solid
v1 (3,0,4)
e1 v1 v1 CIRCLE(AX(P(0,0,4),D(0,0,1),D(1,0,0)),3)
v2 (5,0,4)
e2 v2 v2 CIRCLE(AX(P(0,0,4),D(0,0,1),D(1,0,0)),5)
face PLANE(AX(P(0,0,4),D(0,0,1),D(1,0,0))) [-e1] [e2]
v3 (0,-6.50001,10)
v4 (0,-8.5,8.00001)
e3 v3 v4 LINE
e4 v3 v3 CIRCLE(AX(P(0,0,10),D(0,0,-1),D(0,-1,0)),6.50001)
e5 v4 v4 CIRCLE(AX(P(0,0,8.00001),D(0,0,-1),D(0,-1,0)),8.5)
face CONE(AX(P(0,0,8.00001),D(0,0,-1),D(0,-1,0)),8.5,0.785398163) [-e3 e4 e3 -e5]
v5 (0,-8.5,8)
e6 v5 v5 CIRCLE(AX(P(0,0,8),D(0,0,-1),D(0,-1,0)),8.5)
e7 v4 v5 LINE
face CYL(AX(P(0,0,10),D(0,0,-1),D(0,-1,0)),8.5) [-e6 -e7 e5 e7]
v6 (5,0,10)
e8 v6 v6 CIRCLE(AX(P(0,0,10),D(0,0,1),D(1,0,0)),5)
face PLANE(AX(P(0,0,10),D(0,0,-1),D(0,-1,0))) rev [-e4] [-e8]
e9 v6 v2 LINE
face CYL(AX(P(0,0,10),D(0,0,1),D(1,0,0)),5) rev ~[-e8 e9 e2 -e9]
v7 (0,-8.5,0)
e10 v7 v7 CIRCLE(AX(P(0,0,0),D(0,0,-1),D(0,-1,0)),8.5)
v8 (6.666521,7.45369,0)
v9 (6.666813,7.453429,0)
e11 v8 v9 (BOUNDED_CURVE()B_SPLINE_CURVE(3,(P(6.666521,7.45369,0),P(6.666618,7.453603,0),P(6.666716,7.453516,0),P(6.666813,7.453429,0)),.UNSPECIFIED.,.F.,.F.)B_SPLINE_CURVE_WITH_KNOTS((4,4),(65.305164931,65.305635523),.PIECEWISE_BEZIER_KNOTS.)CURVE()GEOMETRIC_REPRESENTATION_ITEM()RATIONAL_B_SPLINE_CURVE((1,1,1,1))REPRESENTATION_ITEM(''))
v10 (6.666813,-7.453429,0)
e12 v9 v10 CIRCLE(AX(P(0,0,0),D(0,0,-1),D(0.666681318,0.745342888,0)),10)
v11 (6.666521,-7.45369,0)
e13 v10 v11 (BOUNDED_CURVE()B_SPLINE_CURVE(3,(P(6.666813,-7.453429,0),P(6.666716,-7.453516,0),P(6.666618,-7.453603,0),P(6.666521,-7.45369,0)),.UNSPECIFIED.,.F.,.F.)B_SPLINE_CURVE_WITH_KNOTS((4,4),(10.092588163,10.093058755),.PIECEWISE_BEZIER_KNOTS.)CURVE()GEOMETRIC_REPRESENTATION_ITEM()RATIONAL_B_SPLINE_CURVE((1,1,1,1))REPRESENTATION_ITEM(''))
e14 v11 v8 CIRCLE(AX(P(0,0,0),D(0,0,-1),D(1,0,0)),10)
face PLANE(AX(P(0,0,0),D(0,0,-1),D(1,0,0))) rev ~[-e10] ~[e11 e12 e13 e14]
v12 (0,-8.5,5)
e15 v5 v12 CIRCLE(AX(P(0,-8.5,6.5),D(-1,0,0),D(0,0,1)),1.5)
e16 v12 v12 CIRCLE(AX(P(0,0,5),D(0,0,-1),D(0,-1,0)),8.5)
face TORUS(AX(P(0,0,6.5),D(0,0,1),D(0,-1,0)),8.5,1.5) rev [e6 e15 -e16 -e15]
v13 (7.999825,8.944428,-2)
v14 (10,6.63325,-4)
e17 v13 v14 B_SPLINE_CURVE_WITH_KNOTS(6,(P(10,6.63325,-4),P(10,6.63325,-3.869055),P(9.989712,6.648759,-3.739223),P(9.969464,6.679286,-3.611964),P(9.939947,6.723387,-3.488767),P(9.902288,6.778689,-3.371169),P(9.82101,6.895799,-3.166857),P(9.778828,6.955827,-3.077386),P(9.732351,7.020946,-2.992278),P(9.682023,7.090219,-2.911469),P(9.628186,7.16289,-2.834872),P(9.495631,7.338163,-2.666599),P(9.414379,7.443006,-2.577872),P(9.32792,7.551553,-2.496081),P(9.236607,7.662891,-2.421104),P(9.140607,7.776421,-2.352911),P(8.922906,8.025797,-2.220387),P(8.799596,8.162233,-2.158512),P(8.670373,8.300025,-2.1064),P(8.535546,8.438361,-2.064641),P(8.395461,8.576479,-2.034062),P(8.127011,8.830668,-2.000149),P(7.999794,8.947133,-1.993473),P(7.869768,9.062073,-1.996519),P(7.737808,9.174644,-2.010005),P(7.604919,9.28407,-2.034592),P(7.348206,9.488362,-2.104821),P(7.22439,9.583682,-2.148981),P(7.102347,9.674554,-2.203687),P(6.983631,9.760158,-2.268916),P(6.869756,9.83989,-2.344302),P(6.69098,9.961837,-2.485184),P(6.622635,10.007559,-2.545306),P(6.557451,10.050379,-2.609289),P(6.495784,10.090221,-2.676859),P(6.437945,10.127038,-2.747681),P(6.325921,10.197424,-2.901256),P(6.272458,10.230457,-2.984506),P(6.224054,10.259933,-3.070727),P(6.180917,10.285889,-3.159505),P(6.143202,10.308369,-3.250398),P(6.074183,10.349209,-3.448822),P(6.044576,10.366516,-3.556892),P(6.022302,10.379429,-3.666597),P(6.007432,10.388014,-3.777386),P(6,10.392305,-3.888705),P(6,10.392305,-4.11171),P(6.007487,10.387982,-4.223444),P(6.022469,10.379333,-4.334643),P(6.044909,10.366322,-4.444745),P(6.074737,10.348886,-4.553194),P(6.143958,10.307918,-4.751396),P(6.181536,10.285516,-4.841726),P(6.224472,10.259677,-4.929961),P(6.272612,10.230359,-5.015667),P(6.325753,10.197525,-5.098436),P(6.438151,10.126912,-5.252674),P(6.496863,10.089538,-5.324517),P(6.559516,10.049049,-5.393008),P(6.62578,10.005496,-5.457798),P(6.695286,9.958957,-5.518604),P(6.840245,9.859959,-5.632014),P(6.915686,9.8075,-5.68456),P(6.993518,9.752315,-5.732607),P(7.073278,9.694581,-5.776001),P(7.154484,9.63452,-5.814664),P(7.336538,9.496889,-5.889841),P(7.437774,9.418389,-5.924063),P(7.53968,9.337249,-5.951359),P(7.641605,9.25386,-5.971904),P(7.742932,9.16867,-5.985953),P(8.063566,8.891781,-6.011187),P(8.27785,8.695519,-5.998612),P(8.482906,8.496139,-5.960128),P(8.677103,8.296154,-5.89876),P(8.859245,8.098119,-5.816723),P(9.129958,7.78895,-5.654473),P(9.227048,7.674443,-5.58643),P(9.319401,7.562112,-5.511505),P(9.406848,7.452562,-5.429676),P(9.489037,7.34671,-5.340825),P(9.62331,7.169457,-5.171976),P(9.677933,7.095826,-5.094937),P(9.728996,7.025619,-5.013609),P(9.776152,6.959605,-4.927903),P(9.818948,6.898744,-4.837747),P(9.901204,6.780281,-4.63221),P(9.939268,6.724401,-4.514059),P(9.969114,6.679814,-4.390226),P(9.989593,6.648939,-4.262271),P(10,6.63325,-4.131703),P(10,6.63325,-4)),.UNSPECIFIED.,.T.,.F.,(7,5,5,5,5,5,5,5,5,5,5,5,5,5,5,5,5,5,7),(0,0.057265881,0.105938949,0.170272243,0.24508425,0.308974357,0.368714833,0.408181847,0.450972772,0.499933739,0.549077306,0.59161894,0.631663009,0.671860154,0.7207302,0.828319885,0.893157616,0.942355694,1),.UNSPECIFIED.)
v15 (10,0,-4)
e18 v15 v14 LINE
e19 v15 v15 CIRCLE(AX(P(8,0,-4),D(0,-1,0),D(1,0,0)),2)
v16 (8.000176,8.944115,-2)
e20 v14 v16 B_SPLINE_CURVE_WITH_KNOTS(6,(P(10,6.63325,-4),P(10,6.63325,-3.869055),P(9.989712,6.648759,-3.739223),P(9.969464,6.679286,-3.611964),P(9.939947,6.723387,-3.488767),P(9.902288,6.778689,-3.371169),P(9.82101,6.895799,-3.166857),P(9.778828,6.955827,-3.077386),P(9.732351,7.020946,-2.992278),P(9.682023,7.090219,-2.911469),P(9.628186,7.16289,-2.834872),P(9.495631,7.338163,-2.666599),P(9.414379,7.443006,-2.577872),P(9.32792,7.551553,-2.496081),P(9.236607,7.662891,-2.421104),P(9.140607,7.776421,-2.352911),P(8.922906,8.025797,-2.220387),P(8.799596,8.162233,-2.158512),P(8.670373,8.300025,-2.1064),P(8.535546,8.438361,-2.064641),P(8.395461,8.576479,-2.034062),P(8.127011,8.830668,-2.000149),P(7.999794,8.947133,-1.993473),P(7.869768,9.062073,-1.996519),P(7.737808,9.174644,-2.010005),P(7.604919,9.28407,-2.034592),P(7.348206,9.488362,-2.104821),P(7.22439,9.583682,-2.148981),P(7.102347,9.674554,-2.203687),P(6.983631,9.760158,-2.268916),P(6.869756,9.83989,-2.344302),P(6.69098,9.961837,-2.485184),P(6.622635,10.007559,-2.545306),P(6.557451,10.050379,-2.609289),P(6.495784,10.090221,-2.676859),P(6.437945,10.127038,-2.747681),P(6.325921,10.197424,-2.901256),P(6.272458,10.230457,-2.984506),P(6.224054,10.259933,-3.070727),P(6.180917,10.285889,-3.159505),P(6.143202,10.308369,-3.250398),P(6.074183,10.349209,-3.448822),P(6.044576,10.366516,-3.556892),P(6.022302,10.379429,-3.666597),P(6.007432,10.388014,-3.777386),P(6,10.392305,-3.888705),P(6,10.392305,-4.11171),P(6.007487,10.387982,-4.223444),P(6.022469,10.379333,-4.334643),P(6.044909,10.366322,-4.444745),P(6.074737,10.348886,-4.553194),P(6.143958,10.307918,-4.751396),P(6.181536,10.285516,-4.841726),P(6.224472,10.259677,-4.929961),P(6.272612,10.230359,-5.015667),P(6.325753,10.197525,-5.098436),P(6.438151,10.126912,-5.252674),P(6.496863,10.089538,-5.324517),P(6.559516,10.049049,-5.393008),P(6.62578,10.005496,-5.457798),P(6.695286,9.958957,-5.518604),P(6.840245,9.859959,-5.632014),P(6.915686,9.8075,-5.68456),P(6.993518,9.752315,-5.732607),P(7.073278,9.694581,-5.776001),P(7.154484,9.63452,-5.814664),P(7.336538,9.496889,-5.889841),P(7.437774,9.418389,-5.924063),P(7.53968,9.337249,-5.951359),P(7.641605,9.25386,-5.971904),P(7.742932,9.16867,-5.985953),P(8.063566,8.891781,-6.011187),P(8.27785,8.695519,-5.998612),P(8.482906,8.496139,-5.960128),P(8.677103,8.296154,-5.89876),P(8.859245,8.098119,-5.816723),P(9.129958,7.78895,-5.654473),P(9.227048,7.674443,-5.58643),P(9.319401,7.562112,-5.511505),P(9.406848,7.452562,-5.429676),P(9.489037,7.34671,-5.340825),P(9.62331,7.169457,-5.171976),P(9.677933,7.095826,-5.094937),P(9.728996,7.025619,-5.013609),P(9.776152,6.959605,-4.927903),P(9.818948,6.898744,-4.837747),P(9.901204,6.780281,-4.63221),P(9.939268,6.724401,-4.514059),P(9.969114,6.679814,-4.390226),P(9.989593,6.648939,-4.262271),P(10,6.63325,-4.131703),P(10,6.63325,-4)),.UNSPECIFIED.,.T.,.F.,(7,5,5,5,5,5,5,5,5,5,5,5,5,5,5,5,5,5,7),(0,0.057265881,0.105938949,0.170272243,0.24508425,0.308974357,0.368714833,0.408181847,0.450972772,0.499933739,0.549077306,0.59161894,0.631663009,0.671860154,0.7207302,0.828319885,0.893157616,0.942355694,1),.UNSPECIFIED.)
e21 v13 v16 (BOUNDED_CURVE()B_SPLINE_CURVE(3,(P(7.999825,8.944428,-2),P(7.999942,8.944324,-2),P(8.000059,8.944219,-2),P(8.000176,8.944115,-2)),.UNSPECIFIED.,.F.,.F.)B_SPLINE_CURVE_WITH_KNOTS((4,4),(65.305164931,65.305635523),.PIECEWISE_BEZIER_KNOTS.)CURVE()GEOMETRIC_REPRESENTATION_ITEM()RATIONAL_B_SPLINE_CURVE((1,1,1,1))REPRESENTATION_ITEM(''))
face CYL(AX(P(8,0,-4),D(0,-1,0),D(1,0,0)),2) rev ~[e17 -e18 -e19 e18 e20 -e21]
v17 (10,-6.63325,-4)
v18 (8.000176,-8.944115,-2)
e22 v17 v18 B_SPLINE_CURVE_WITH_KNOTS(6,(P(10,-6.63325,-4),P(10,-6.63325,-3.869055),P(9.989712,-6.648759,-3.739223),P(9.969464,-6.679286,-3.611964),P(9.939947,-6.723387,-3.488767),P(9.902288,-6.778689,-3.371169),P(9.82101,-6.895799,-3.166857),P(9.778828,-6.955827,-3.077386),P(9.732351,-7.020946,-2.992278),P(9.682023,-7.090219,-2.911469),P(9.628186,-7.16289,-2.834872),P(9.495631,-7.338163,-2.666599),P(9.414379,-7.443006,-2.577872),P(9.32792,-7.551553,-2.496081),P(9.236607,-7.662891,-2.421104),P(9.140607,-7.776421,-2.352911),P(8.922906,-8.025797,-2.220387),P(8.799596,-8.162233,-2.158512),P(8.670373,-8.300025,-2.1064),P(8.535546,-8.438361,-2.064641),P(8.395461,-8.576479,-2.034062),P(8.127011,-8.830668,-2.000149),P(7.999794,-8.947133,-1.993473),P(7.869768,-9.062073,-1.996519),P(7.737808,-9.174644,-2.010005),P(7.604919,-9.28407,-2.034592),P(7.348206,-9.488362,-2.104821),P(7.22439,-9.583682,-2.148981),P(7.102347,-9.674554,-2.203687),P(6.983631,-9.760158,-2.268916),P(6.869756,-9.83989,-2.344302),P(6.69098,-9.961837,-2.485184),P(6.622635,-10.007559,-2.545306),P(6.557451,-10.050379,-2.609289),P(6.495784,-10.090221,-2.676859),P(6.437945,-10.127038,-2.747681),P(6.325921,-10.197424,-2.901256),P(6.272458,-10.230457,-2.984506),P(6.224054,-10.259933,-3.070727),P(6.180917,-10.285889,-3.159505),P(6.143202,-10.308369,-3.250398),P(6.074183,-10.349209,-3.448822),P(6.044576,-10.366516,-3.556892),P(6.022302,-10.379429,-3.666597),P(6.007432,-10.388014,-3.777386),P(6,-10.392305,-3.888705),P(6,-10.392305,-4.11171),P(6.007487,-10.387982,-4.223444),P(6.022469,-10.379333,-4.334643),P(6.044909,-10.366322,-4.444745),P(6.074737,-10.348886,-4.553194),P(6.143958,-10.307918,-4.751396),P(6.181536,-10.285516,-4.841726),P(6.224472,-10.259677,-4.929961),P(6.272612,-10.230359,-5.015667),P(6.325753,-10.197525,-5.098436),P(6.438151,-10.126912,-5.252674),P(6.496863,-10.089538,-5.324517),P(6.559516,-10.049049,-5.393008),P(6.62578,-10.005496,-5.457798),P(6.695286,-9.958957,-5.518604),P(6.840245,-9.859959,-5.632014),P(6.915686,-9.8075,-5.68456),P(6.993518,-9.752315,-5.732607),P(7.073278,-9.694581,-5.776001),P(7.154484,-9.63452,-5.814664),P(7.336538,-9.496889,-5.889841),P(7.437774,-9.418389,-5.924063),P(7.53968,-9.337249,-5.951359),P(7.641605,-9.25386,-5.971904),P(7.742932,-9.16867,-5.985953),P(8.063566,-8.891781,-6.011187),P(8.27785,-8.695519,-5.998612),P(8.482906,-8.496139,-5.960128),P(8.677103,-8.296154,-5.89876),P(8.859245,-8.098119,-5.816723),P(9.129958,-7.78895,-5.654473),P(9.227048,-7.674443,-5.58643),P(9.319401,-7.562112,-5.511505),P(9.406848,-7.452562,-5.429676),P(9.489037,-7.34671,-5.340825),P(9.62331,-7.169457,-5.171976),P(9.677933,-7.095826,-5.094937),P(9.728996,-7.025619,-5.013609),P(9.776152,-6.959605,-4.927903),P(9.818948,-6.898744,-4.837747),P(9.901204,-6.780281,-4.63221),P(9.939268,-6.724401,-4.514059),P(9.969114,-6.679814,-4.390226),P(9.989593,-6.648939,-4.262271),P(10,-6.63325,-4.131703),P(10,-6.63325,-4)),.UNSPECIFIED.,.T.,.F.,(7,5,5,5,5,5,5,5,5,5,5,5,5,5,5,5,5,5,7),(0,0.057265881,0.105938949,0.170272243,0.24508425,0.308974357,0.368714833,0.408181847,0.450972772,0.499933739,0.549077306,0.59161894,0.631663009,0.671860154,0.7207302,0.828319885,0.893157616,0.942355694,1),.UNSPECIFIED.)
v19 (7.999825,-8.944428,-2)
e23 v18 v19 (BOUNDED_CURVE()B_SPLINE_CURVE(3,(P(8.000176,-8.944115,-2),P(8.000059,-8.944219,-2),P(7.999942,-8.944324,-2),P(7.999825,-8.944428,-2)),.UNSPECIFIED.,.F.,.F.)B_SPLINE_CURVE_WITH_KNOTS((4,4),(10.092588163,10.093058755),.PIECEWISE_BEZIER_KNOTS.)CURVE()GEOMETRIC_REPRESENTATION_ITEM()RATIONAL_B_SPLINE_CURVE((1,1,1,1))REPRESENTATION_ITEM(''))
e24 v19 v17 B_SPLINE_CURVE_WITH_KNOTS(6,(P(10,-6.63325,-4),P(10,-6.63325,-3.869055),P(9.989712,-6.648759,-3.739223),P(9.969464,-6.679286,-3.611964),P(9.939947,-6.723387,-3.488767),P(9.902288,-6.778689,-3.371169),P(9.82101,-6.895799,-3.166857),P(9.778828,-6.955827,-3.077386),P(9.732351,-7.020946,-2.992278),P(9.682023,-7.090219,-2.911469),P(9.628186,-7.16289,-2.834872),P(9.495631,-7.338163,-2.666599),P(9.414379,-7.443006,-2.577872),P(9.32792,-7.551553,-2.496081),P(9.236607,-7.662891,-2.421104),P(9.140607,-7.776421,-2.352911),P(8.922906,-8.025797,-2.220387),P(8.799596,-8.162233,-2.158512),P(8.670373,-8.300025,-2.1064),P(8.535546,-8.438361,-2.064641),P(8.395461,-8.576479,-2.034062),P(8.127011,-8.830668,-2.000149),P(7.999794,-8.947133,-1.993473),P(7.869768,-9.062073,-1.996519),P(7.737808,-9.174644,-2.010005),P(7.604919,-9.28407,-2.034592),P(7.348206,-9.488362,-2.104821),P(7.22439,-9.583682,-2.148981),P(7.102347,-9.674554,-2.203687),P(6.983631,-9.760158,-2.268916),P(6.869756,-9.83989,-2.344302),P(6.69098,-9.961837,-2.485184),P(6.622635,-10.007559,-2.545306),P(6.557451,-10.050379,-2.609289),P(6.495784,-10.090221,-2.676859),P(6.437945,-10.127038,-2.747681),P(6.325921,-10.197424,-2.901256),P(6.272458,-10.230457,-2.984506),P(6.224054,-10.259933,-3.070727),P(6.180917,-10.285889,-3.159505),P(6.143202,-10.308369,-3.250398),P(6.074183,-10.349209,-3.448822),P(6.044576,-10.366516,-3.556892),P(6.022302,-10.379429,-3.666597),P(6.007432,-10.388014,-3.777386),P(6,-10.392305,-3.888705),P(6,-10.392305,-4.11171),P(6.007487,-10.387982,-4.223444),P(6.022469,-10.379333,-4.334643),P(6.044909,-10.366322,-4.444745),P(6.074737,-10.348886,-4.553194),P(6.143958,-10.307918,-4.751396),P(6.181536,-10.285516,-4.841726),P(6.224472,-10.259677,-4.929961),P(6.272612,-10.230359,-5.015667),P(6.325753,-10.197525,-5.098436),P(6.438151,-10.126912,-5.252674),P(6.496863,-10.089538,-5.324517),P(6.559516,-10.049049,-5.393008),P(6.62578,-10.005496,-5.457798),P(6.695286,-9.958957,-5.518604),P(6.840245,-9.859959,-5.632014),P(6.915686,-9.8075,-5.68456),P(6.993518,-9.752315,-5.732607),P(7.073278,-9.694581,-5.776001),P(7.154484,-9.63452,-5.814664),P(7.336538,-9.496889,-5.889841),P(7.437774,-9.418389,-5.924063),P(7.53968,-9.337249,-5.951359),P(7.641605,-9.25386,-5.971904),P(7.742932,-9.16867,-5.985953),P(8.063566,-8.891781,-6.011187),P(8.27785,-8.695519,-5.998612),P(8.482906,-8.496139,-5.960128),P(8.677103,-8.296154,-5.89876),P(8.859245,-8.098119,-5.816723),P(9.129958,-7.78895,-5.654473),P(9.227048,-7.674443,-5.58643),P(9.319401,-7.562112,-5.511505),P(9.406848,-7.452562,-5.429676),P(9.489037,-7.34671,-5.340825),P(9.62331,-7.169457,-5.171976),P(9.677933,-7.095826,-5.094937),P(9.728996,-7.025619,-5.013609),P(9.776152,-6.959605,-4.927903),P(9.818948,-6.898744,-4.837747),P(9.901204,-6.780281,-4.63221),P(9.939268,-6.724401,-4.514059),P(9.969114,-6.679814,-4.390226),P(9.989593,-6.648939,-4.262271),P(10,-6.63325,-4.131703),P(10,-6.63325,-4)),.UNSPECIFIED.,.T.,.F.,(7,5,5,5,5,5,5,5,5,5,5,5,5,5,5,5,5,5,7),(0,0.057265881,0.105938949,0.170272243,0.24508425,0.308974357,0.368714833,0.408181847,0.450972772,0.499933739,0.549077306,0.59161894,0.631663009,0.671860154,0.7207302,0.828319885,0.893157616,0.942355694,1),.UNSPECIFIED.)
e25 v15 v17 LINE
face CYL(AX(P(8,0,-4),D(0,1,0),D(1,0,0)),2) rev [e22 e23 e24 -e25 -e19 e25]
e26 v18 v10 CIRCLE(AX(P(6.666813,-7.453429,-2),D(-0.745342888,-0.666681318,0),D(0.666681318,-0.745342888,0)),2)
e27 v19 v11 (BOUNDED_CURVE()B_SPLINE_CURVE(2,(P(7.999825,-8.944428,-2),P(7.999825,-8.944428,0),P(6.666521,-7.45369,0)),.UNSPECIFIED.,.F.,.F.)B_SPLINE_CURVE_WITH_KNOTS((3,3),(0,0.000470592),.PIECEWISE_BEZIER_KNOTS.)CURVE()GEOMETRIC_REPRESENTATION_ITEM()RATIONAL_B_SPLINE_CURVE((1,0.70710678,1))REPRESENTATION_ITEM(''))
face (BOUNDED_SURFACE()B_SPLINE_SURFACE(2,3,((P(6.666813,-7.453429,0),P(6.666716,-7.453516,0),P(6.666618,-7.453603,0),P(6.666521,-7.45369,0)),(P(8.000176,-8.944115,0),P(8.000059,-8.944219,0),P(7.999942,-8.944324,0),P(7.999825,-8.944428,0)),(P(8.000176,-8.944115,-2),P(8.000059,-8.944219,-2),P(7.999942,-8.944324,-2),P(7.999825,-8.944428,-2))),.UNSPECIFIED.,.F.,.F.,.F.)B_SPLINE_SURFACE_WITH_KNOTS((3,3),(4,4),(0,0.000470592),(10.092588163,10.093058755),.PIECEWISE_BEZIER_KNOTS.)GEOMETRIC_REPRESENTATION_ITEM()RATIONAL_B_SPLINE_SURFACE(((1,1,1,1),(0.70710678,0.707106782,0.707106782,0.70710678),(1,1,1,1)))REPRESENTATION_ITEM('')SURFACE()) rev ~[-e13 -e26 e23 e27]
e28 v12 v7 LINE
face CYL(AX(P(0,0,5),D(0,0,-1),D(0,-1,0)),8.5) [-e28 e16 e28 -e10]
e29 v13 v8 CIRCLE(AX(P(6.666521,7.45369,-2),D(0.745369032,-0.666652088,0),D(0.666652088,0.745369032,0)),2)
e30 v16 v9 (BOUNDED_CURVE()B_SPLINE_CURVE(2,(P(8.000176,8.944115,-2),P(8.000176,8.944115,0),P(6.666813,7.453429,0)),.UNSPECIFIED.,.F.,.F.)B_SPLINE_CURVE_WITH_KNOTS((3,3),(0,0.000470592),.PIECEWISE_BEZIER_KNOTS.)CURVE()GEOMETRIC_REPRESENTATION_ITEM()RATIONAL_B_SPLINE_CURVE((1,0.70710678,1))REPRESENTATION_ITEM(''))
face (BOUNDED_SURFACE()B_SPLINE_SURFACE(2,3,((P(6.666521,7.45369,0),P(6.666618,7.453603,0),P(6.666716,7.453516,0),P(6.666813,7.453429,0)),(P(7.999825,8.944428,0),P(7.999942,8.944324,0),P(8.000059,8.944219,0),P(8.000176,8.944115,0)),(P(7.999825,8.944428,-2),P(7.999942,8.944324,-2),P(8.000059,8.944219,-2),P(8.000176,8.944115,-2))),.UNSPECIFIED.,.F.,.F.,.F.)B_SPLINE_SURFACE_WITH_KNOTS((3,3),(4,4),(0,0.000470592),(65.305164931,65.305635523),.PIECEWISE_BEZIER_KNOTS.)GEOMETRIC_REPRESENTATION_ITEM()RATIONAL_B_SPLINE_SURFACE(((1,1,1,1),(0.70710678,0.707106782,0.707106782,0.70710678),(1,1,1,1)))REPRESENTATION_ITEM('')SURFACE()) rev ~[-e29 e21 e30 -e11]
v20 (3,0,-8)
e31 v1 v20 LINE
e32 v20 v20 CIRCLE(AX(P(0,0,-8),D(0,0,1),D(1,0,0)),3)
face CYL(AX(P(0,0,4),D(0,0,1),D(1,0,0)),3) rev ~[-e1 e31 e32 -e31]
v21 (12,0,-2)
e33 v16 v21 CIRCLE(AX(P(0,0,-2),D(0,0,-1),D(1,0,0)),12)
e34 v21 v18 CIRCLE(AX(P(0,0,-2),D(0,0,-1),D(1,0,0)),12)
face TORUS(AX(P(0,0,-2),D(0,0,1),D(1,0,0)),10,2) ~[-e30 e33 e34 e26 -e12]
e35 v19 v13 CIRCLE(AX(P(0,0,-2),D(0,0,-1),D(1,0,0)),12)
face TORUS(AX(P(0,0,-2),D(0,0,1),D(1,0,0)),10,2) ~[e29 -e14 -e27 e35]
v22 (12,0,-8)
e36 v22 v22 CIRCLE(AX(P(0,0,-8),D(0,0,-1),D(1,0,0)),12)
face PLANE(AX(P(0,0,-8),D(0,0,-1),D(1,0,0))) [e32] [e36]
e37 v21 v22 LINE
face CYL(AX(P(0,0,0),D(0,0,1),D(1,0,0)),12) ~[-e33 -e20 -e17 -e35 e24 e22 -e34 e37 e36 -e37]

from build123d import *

# Parameters (mm, degrees)
F2_SIZE        = 1.99999
F3_R           = 5
F4_DEPTH       = 6
F5_R           = 12
F6_DEPTH       = 8
F7_R           = 3
F8_DEPTH       = 12
F9_R           = 2
F10_DEPTH      = 12.001
F10_DEPTH_BACK = 12.001
F11_R          = 2


# Not quite as in the source:
# - a fillet or chamfer is up to 0.001 mm smaller than in the source, because OpenCascade refuses the exact size


with BuildPart() as f1:
    # F0 (on Right) → F1 (revolve)
    with BuildSketch(Plane.YZ):
        with BuildLine():
            Line((-8.5, 0), (0, 0))
            Line((0, 0), (0, 10))
            Line((0, 10), (-8.5, 10))
            Line((-8.5, 10), (-8.5, 8))
            ThreePointArc((-8.5, 8), (-7, 6.5), (-8.5, 5))
            Line((-8.5, 5), (-8.5, 0))
        make_face()
    revolve(axis=Axis((0, 0, 5), (0, 0, -1)))

    # F2 (size 2 in the source; OpenCascade refuses exactly that, so slightly less here)
    f2_edges = [f1.edges().sort_by_distance(p)[0] for p in [
        (0, 8.5, 10),
    ]]
    chamfer(f2_edges, length=F2_SIZE)

    # F3 (on face) → F4 (cut)
    with BuildSketch(Plane.XY.offset(10)):
        Circle(F3_R)
    extrude(amount=-F4_DEPTH, mode=Mode.SUBTRACT)

    # F5 (on face) → F6 (join)
    with BuildSketch(Plane(origin=(0, 0, 0), x_dir=(1, 0, 0), z_dir=(0, 0, -1))):
        Circle(F5_R)
    extrude(amount=F6_DEPTH)

    # F7 (on face) → F8 (cut, through all)
    with BuildSketch(Plane.XY.offset(4)):
        Circle(F7_R)
    extrude(amount=-F8_DEPTH, mode=Mode.SUBTRACT)

    # F9 (on Front) → F10 (cut, two sides)
    with BuildSketch(Plane.XZ) as f10_sk:
        with Locations((8, -4)):
            Circle(F9_R)
    extrude(amount=-F10_DEPTH, mode=Mode.SUBTRACT)
    extrude(f10_sk.sketch, amount=F10_DEPTH_BACK, mode=Mode.SUBTRACT)

    # F11
    f11_edges = [f1.edges().sort_by_distance(p)[0] for p in [
        (-12, 0, 0),
    ]]
    fillet(f11_edges, radius=F11_R)


solid = f1.part
